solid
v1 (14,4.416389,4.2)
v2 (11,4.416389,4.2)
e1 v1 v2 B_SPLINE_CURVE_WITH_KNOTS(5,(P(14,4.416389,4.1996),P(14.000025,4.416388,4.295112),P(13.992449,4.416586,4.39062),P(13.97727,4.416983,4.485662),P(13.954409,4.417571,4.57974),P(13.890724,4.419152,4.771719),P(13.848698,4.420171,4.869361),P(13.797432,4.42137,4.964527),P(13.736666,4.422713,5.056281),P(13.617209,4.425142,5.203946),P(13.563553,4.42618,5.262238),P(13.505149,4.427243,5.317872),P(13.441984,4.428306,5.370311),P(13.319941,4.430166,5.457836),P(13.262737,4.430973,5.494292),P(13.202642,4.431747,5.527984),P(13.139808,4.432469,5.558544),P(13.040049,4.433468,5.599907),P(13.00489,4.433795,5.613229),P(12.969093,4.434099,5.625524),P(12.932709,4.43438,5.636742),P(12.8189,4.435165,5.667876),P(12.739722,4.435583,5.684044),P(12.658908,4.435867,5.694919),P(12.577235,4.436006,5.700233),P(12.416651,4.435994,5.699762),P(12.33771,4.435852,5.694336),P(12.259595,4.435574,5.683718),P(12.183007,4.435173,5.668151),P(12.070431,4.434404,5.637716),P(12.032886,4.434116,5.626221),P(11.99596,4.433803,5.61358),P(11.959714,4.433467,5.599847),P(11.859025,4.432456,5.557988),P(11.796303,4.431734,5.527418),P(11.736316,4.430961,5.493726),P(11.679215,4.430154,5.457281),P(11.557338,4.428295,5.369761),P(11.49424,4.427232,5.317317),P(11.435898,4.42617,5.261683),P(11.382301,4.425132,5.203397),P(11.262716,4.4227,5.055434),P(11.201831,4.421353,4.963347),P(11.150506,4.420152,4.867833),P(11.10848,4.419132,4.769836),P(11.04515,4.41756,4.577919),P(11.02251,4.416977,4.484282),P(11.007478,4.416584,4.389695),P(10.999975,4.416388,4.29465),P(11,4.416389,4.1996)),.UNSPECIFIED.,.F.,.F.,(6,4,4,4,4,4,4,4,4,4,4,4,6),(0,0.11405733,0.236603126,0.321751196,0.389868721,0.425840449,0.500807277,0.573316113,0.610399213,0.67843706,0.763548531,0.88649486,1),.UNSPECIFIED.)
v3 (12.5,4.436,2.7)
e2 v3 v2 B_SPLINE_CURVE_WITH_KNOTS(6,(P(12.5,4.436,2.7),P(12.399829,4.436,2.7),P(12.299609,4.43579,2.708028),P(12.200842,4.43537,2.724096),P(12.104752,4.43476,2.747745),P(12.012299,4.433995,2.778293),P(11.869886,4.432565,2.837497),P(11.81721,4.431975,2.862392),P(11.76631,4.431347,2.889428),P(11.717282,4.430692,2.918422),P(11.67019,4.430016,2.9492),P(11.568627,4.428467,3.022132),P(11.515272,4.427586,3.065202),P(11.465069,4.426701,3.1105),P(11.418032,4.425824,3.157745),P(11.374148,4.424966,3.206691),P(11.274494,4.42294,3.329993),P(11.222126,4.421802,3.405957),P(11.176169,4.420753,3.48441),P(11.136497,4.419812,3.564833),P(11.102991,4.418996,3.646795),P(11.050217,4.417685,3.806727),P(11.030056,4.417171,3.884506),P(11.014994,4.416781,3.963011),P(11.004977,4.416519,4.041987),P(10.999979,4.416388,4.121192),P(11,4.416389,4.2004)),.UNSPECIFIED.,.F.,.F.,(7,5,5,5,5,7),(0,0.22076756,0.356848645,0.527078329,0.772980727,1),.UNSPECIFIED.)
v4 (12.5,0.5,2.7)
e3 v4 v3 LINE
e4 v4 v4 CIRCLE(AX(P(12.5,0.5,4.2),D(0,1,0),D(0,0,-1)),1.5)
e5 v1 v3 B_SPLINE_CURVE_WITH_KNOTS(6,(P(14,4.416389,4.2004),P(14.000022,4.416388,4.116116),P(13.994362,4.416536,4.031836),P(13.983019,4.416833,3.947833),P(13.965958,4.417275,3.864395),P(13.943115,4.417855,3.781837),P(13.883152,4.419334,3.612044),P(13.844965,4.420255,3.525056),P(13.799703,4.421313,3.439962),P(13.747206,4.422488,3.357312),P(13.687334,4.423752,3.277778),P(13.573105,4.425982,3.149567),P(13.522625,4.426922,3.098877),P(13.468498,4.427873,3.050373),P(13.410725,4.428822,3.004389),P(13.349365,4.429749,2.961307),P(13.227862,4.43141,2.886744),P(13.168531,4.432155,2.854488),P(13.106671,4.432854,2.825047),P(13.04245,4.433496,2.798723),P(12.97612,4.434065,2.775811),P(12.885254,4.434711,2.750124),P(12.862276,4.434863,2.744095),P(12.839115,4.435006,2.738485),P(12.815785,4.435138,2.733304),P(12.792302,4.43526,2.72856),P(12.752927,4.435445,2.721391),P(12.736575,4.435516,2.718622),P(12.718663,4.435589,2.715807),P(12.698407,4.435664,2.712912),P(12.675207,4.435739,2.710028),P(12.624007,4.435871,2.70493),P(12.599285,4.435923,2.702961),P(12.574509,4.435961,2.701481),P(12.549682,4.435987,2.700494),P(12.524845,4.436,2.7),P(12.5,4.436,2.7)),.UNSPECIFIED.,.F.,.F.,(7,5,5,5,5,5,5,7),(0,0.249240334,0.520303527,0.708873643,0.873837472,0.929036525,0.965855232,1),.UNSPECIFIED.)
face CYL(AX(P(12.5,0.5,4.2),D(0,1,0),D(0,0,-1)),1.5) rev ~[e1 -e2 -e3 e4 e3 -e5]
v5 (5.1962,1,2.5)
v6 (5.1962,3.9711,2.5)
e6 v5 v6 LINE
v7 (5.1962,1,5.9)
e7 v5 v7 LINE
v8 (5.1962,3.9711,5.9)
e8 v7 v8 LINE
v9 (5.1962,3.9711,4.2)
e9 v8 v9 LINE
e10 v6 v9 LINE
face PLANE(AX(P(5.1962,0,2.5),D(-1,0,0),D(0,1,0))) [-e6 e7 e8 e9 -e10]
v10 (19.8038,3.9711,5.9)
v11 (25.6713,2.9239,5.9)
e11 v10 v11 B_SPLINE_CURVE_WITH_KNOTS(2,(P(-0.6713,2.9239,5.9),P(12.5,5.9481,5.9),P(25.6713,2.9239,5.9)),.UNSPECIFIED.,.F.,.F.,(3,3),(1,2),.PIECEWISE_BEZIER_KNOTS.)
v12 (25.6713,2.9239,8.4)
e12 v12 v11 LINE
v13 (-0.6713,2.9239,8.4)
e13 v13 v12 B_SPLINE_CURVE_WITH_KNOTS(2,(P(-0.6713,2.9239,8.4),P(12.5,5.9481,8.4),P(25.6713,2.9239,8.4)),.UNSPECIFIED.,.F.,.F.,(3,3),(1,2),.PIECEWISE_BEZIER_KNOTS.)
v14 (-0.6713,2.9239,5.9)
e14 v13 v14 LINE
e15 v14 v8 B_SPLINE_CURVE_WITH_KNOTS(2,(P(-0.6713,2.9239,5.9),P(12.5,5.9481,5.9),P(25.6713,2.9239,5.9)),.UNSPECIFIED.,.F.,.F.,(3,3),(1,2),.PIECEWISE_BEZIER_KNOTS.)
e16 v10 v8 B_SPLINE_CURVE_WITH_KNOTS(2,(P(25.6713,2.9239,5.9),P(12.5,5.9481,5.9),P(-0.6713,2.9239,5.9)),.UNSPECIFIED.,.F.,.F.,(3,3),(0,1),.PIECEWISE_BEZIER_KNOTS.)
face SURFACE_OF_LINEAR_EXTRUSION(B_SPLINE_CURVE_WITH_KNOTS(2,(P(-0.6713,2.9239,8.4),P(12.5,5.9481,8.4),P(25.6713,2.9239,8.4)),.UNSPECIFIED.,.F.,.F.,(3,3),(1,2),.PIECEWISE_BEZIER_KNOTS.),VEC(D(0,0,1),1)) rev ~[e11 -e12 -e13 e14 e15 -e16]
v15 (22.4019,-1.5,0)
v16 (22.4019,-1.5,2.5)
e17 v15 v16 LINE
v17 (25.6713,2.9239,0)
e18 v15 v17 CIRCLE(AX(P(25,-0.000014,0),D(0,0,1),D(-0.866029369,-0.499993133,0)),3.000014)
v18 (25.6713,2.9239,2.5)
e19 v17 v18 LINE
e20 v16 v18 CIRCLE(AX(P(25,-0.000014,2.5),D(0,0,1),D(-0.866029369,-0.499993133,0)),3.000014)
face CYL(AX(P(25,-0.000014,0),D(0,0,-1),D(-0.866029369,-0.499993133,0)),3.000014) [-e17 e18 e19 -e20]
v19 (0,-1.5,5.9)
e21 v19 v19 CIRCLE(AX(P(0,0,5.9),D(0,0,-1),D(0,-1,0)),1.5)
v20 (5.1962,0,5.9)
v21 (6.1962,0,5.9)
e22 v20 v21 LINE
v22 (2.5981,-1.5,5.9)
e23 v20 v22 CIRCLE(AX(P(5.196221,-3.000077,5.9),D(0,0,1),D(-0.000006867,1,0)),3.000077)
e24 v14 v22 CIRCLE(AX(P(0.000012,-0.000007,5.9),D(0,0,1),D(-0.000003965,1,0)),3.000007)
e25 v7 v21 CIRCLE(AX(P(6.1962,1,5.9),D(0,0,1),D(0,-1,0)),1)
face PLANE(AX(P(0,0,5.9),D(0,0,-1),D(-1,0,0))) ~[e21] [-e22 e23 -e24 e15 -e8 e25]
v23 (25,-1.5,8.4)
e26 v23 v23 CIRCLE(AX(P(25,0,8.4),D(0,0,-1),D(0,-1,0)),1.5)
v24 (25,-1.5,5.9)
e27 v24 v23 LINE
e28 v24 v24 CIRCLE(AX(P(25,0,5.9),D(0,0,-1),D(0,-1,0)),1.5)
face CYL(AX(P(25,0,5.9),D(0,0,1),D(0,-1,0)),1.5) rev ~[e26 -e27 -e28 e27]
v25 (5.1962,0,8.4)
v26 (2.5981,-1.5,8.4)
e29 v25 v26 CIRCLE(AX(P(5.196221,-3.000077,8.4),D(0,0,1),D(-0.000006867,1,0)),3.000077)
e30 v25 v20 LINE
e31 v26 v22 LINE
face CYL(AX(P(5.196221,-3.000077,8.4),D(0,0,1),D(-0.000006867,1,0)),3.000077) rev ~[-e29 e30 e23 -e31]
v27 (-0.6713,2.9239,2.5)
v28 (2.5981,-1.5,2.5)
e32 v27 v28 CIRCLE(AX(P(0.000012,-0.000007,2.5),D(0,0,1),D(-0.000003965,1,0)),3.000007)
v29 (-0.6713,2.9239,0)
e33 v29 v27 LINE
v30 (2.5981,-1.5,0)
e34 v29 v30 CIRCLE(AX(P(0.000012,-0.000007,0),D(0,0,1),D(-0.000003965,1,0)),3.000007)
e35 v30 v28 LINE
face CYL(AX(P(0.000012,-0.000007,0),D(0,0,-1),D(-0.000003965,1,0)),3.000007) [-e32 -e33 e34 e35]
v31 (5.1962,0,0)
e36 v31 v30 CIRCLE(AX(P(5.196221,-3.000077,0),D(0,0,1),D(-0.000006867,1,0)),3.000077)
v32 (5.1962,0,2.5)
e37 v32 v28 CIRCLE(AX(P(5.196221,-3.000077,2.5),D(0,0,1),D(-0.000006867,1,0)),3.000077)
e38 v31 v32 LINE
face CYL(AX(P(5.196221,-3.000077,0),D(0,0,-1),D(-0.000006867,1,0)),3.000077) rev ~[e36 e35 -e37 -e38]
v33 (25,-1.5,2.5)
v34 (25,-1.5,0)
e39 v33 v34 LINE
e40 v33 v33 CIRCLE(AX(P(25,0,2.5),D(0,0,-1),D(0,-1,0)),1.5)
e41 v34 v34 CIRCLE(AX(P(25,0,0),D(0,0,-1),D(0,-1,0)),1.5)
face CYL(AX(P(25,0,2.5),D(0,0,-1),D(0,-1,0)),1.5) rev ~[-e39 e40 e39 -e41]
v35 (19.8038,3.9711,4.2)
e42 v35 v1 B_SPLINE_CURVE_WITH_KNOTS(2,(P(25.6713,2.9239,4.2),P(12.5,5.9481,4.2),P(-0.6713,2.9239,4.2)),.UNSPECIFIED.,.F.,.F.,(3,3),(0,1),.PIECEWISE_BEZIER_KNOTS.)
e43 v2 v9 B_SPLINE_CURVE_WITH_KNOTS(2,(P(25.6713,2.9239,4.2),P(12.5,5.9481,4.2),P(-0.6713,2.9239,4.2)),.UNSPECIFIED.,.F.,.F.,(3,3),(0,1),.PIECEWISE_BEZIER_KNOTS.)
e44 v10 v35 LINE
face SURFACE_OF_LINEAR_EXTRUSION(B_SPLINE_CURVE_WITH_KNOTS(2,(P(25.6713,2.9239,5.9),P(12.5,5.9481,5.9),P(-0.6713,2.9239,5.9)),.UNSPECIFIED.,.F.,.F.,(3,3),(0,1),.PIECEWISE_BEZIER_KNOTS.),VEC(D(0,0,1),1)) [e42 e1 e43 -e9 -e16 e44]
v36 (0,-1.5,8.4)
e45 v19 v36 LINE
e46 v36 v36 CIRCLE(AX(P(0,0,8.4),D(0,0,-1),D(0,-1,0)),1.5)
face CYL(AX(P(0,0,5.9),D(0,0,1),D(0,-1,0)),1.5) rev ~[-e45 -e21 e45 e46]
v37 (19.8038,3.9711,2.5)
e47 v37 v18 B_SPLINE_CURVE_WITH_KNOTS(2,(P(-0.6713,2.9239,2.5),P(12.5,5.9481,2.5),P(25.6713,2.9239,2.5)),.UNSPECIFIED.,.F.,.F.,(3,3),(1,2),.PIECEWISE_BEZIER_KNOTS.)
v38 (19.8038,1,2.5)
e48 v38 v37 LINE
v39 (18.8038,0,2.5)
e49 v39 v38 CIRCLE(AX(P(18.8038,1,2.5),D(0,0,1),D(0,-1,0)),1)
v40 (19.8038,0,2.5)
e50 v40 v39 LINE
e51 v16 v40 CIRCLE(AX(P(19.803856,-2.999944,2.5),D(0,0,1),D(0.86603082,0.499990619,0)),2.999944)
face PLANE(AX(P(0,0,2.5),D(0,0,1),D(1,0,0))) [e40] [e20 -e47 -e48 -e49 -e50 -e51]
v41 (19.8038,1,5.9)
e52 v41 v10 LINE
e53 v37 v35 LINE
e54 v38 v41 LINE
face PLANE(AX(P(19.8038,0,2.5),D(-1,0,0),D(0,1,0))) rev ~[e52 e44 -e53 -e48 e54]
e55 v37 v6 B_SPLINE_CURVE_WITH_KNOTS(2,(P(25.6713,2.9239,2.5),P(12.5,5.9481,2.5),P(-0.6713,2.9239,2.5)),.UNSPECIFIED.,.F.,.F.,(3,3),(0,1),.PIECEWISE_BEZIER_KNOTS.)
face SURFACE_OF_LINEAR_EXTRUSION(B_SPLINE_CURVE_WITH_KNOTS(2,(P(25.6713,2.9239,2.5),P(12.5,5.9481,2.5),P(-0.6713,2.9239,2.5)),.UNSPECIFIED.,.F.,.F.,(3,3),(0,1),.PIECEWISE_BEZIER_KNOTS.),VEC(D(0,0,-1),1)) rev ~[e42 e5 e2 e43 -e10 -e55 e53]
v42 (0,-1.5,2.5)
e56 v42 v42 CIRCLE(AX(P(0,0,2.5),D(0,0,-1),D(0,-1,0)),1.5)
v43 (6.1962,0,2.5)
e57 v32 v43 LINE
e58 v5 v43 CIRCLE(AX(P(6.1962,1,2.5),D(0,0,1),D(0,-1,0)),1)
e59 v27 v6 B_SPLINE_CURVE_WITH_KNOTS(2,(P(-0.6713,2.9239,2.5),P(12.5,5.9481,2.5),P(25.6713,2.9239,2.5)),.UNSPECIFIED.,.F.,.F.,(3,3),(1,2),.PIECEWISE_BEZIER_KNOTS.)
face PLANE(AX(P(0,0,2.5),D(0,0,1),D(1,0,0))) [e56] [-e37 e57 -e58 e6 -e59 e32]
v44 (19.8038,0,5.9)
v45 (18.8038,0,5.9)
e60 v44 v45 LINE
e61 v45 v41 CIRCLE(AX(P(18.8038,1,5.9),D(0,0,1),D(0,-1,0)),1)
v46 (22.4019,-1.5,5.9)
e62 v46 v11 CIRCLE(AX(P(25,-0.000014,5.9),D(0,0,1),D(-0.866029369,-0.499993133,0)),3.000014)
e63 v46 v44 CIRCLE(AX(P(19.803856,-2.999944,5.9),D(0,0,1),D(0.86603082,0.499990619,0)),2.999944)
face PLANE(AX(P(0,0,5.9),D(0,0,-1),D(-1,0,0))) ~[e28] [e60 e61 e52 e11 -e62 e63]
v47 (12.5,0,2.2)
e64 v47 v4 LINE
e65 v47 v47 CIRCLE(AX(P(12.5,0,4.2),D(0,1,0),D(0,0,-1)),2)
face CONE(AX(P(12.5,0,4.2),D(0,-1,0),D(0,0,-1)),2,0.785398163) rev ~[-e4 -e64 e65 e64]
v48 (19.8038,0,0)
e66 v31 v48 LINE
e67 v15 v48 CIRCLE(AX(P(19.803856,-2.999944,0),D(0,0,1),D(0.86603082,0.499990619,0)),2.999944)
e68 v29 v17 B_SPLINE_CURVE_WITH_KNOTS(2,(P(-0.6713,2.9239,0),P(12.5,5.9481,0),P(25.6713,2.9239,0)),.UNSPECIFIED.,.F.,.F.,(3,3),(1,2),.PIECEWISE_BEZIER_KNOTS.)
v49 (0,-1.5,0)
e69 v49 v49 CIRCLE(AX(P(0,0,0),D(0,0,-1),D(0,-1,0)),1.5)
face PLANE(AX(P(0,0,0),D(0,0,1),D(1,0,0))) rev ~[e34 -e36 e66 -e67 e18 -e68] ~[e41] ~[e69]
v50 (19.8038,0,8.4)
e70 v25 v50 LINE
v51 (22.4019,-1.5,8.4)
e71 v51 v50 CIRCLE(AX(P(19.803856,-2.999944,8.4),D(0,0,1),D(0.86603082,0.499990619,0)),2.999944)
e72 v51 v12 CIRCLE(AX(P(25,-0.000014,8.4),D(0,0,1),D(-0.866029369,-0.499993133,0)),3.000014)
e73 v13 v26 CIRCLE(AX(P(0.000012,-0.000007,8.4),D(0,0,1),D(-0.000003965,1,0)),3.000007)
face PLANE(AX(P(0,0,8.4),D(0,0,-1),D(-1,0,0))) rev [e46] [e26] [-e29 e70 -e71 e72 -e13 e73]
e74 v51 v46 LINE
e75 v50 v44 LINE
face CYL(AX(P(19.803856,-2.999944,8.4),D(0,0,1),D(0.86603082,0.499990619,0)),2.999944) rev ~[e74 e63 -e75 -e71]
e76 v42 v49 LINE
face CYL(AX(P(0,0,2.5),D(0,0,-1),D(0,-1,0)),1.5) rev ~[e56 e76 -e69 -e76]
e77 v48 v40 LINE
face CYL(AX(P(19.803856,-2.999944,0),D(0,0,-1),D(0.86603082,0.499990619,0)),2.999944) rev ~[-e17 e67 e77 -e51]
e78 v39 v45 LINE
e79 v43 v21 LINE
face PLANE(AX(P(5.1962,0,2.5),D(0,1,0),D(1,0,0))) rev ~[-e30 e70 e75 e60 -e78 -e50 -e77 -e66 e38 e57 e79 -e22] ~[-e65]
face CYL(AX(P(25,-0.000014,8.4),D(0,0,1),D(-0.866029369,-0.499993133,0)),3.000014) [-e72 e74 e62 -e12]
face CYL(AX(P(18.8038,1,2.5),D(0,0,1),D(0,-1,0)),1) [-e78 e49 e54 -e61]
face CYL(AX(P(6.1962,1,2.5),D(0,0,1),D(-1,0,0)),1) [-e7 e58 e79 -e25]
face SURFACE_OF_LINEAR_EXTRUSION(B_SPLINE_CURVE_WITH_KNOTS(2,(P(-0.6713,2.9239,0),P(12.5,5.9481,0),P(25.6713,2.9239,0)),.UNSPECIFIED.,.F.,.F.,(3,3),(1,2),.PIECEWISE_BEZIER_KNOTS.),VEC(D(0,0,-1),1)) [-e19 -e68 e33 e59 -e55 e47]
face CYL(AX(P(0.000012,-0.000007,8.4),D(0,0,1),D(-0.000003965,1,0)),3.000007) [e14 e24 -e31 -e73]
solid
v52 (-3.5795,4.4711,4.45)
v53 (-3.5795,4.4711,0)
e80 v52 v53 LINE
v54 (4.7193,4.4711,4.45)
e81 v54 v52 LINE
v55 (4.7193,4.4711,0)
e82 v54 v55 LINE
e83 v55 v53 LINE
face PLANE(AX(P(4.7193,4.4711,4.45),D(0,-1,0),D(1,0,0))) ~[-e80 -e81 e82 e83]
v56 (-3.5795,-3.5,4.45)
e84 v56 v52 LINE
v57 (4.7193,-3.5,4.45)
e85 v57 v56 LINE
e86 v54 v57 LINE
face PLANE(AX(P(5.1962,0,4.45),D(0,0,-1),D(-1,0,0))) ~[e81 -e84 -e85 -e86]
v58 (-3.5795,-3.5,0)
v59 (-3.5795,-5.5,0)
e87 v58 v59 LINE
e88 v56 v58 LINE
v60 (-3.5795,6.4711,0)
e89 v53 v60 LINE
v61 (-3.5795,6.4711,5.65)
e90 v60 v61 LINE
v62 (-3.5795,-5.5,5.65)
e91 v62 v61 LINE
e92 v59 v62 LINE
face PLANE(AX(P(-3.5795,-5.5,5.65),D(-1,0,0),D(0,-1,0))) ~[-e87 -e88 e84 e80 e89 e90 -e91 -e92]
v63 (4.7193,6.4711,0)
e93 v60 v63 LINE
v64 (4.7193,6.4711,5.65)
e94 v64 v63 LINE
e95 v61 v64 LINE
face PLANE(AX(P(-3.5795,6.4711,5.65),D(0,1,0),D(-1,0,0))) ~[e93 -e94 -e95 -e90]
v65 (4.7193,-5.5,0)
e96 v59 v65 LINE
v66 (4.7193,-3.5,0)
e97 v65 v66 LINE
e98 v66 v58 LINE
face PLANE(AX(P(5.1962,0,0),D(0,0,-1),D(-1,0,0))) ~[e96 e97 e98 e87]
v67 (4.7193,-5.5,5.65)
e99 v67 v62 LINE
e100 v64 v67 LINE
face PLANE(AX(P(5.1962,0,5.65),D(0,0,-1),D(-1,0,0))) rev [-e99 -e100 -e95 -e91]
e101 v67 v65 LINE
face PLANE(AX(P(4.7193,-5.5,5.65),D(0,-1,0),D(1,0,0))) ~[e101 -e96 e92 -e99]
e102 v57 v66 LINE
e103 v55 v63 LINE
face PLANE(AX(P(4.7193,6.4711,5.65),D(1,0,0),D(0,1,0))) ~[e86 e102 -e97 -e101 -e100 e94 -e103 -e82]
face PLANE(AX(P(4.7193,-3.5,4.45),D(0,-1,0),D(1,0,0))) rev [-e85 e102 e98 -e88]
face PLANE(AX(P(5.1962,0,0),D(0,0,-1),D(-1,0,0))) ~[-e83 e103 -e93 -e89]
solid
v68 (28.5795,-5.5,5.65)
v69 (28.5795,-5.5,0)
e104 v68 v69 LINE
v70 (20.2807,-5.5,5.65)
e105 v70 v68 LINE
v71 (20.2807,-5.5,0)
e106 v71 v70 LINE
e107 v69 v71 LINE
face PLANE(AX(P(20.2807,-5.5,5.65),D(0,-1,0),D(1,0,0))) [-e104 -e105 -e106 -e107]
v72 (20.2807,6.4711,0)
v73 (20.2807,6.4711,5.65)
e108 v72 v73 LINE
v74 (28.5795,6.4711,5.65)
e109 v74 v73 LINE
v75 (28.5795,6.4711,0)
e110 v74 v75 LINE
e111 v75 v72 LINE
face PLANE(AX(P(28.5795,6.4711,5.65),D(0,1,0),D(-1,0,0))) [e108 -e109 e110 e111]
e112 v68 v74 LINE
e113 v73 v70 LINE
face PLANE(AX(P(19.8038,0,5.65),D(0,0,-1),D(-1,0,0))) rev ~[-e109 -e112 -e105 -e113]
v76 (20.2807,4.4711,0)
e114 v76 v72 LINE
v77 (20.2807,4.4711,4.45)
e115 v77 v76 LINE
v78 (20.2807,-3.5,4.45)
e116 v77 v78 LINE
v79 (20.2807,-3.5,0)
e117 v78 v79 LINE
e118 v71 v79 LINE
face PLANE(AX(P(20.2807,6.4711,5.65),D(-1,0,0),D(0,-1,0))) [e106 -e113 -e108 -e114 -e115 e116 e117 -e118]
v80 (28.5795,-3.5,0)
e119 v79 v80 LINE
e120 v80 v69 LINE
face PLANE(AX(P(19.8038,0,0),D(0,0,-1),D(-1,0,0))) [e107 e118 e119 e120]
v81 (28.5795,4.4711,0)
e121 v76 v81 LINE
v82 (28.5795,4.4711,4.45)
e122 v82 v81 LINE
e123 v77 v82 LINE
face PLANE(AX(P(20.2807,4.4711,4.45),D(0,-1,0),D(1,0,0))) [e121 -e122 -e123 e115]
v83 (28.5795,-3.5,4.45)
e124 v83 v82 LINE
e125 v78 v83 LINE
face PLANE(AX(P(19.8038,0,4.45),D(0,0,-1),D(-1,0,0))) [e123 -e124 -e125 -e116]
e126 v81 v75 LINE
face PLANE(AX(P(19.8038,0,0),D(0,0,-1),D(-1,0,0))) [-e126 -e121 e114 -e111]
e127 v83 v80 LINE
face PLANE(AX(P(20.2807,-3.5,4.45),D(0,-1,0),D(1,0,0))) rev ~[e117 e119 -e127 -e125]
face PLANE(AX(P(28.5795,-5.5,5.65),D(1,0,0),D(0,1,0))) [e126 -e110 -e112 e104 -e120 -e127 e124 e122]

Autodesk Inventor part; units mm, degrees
ref_plane "YZ Plane" through (0, 0, 0) normal (1, 0, 0) x (0, 1, 0)
ref_plane "XZ Plane" through (0, 0, 0) normal (0, 1, 0) x (-1, 0, 0)
ref_plane "XY Plane" through (0, 0, 0) normal (0, 0, 1) x (1, 0, 0)
sketch "Skizze1" plane through (0, 0, 0) normal (0, 0, 1) x (1, 0, 0)
  line L0 (0, 0) -> (25, 0) construction
  arc A0 (0, 3) -> (2.5981, -1.5) centre (0, 0) ccw
  arc A1 (22.4019, -1.5) -> (25, 3) centre (25, 0) ccw
  arc A2 (22.4019, -1.5) -> (19.8038, 0) centre (19.8038, -3) ccw
  arc A3 (5.1962, 0) -> (2.5981, -1.5) centre (5.1962, -3) ccw
  line L1 (0, 3) -> (25, 3)
  line L2 (5.1962, 0) -> (19.8038, 0)
  line L3 (12.5, 0) -> (12.5, 11.1623) construction
  line L4 (-0.6713, 2.9239) -> (12.5, 5.9481) construction
  line L5 (12.5, 5.9481) -> (25.6713, 2.9239) construction
  spline S0 degree 2 poles (-0.6713, 2.9239) (12.5, 5.9481) (25.6713, 2.9239) knots 1 1 1 2 2 2
  dimension "d0" = 25
  dimension "d1" = 3
  dimension "d2" = 3
ref_plane "Arbeitsebene1" through (0, 3, 0) normal (0, 0, -1) x (1, 0, 0)
extrude "Extrusion1" add sketch "Skizze1" along normal blind 2.5
sketch "Skizze2" plane through (0, 0, 2.5) normal (0, 0, 1) x (1, 0, 0)
  arc A0 (-0.6713, 2.9239) -> (2.5981, -1.5) centre (0, 0) ccw projected
  arc A1 (22.4019, -1.5) -> (25.6713, 2.9239) centre (25, 0) ccw projected
  point P0 (0, 3)
  point P1 (25, 3)
hole "Bohrung1" at (0, 0, 2.5) at (25, 0, 2.5) direction (0, 0, -1) diameter 3 end through all
sketch "Skizze4" plane through (0, 0, 2.5) normal (0, 0, 1) x (1, 0, 0)
  line L0 (5.1962, 0) -> (19.8038, 0)
  line L1 (5.1962, 0) -> (5.1962, 3.9711)
  line L2 (19.8038, 0) -> (19.8038, 3.9711)
  line L3 (5.1962, 0) -> (19.8038, 0) projected
  spline S0 degree 2 poles (25.6713, 2.9239) (12.5, 5.9481) (-0.6713, 2.9239) knots 0 0 0 1 1 1 projected
extrude "Extrusion2" add sketch "Skizze4" along normal blind 1.7
mirror "Spiegeln1" about plane through (12.5, 1.8725, 4.2) normal (0, 0, 1)
fillet "Rundung1" radius 1 2 edges at (5.1962, 0, 4.2) (19.8038, 0, 4.2)
ref_plane "Arbeitsebene2" through (19.8038, 0, 5.65) normal (0, 0, -1) x (-1, 0, 0)
sketch "Skizze5" plane through (19.8038, 0, 5.65) normal (0, 0, -1) x (-1, 0, 0)
  arc A0 (-5.8675, 2.9239) -> (-2.5981, -1.5) centre (-5.1962, 0) ccw construction
  arc A1 (0, 0) -> (-2.5981, -1.5) centre (0, -3) ccw construction
  line L0 (0, 0) -> (1, 0) construction
  arc A2 (0, 1) -> (1, 0) centre (1, 1) ccw construction
  line L1 (0, 3.9711) -> (0, 1) construction
  circle A3 centre (-5.1962, 0) radius 1.5 construction
  line L2 (-8.7757, 6.4711) -> (-0.4769, 6.4711)
  line L3 (-0.4769, 6.4711) -> (-0.4769, -5.5)
  line L4 (-0.4769, -5.5) -> (-8.7757, -5.5)
  line L5 (-8.7757, -5.5) -> (-8.7757, 6.4711)
  line L6 (14.6077, 1) -> (14.6077, 3.9711) projected
  arc A4 (13.6077, 0) -> (14.6077, 1) centre (13.6077, 1) ccw projected
  line L7 (13.6077, 0) -> (14.6077, 0) projected
  arc A5 (17.2058, -1.5) -> (14.6077, 0) centre (14.6077, -3) ccw projected
  arc A6 (17.2058, -1.5) -> (20.4752, 2.9239) centre (19.8038, 0) ccw projected
  dimension "d17" = 2.5
  dimension "d36" = 2.5
extrude "Extrusion3" add sketch "Skizze5" along normal blind 1.2 separate body
sketch "Skizze6" plane through (19.8038, 0, 4.45) normal (0, 0, -1) x (-1, 0, 0)
  line L0 (-8.7757, -5.5) -> (-0.4769, -5.5) projected
  line L1 (-0.4769, -5.5) -> (-0.4769, 6.4711) projected
  line L2 (-8.7757, 6.4711) -> (-0.4769, 6.4711)
  line L3 (-0.4769, 6.4711) -> (-0.4769, 4.4711)
  line L4 (-0.4769, 4.4711) -> (-8.7757, 4.4711)
  line L5 (-8.7757, 4.4711) -> (-8.7757, 6.4711)
  line L6 (-8.7757, -5.5) -> (-0.4769, -5.5)
  line L7 (-0.4769, -5.5) -> (-0.4769, -3.5)
  line L8 (-0.4769, -3.5) -> (-8.7757, -3.5)
  line L9 (-8.7757, -3.5) -> (-8.7757, -5.5)
  point P0 (19.8038, 0)
  dimension "d20" = 2
  dimension "d21" = 2
extrude "Extrusion4" add sketch "Skizze6" along normal up to surface (4.45 mm away)
ref_plane "Arbeitsebene3" through (12.5, 0, 8.4) normal (1, 0, 0) x (0, 1, 0)
mirror "Spiegeln2" about plane through (12.5, 0, 8.4) normal (1, 0, 0) of "Extrusion3", "Extrusion4"
sketch "Skizze7" plane through (5.1962, 0, 0) normal (0, -1, 0) x (1, 0, 0)
  line L0 (1, 2.5) -> (1, 5.9) projected
  line L1 (13.6077, 5.9) -> (13.6077, 2.5) projected
  line L2 (1, 4.2) -> (13.6077, 4.2) construction
  point P0 (-5.1962, 0)
  point P1 (7.3038, 4.2)
hole "Bohrung2" at (12.5, 0, 4.2) direction (0, 1, 0) diameter 3 end through all countersink diameter 4 countersink angle 90
equation "\"d0\" = Hebel_B"
equation "\"d1\" = FingerWall"
equation "\"d36\" = d17"
equation "\"d21\" = d20"
equation "\"FingerLaenge_B\" = 25"
equation "\"Hebel_B\" = 25"
equation "\"Finger_width\" = 22"
equation "\"Hebel_basis_2\" = 15"
equation "\"Finger_diameter\" = 8"
equation "\"FingerWall\" = 3"
equation "\"Join_width\" = 3"
equation "\"bearingHole\" = 3"
equation "\"bearingWall\" = 4"
equation "\"support_D\" = 0.25"
equation "\"d37\" = support_D"
properties part number "Hebel_B dual"
